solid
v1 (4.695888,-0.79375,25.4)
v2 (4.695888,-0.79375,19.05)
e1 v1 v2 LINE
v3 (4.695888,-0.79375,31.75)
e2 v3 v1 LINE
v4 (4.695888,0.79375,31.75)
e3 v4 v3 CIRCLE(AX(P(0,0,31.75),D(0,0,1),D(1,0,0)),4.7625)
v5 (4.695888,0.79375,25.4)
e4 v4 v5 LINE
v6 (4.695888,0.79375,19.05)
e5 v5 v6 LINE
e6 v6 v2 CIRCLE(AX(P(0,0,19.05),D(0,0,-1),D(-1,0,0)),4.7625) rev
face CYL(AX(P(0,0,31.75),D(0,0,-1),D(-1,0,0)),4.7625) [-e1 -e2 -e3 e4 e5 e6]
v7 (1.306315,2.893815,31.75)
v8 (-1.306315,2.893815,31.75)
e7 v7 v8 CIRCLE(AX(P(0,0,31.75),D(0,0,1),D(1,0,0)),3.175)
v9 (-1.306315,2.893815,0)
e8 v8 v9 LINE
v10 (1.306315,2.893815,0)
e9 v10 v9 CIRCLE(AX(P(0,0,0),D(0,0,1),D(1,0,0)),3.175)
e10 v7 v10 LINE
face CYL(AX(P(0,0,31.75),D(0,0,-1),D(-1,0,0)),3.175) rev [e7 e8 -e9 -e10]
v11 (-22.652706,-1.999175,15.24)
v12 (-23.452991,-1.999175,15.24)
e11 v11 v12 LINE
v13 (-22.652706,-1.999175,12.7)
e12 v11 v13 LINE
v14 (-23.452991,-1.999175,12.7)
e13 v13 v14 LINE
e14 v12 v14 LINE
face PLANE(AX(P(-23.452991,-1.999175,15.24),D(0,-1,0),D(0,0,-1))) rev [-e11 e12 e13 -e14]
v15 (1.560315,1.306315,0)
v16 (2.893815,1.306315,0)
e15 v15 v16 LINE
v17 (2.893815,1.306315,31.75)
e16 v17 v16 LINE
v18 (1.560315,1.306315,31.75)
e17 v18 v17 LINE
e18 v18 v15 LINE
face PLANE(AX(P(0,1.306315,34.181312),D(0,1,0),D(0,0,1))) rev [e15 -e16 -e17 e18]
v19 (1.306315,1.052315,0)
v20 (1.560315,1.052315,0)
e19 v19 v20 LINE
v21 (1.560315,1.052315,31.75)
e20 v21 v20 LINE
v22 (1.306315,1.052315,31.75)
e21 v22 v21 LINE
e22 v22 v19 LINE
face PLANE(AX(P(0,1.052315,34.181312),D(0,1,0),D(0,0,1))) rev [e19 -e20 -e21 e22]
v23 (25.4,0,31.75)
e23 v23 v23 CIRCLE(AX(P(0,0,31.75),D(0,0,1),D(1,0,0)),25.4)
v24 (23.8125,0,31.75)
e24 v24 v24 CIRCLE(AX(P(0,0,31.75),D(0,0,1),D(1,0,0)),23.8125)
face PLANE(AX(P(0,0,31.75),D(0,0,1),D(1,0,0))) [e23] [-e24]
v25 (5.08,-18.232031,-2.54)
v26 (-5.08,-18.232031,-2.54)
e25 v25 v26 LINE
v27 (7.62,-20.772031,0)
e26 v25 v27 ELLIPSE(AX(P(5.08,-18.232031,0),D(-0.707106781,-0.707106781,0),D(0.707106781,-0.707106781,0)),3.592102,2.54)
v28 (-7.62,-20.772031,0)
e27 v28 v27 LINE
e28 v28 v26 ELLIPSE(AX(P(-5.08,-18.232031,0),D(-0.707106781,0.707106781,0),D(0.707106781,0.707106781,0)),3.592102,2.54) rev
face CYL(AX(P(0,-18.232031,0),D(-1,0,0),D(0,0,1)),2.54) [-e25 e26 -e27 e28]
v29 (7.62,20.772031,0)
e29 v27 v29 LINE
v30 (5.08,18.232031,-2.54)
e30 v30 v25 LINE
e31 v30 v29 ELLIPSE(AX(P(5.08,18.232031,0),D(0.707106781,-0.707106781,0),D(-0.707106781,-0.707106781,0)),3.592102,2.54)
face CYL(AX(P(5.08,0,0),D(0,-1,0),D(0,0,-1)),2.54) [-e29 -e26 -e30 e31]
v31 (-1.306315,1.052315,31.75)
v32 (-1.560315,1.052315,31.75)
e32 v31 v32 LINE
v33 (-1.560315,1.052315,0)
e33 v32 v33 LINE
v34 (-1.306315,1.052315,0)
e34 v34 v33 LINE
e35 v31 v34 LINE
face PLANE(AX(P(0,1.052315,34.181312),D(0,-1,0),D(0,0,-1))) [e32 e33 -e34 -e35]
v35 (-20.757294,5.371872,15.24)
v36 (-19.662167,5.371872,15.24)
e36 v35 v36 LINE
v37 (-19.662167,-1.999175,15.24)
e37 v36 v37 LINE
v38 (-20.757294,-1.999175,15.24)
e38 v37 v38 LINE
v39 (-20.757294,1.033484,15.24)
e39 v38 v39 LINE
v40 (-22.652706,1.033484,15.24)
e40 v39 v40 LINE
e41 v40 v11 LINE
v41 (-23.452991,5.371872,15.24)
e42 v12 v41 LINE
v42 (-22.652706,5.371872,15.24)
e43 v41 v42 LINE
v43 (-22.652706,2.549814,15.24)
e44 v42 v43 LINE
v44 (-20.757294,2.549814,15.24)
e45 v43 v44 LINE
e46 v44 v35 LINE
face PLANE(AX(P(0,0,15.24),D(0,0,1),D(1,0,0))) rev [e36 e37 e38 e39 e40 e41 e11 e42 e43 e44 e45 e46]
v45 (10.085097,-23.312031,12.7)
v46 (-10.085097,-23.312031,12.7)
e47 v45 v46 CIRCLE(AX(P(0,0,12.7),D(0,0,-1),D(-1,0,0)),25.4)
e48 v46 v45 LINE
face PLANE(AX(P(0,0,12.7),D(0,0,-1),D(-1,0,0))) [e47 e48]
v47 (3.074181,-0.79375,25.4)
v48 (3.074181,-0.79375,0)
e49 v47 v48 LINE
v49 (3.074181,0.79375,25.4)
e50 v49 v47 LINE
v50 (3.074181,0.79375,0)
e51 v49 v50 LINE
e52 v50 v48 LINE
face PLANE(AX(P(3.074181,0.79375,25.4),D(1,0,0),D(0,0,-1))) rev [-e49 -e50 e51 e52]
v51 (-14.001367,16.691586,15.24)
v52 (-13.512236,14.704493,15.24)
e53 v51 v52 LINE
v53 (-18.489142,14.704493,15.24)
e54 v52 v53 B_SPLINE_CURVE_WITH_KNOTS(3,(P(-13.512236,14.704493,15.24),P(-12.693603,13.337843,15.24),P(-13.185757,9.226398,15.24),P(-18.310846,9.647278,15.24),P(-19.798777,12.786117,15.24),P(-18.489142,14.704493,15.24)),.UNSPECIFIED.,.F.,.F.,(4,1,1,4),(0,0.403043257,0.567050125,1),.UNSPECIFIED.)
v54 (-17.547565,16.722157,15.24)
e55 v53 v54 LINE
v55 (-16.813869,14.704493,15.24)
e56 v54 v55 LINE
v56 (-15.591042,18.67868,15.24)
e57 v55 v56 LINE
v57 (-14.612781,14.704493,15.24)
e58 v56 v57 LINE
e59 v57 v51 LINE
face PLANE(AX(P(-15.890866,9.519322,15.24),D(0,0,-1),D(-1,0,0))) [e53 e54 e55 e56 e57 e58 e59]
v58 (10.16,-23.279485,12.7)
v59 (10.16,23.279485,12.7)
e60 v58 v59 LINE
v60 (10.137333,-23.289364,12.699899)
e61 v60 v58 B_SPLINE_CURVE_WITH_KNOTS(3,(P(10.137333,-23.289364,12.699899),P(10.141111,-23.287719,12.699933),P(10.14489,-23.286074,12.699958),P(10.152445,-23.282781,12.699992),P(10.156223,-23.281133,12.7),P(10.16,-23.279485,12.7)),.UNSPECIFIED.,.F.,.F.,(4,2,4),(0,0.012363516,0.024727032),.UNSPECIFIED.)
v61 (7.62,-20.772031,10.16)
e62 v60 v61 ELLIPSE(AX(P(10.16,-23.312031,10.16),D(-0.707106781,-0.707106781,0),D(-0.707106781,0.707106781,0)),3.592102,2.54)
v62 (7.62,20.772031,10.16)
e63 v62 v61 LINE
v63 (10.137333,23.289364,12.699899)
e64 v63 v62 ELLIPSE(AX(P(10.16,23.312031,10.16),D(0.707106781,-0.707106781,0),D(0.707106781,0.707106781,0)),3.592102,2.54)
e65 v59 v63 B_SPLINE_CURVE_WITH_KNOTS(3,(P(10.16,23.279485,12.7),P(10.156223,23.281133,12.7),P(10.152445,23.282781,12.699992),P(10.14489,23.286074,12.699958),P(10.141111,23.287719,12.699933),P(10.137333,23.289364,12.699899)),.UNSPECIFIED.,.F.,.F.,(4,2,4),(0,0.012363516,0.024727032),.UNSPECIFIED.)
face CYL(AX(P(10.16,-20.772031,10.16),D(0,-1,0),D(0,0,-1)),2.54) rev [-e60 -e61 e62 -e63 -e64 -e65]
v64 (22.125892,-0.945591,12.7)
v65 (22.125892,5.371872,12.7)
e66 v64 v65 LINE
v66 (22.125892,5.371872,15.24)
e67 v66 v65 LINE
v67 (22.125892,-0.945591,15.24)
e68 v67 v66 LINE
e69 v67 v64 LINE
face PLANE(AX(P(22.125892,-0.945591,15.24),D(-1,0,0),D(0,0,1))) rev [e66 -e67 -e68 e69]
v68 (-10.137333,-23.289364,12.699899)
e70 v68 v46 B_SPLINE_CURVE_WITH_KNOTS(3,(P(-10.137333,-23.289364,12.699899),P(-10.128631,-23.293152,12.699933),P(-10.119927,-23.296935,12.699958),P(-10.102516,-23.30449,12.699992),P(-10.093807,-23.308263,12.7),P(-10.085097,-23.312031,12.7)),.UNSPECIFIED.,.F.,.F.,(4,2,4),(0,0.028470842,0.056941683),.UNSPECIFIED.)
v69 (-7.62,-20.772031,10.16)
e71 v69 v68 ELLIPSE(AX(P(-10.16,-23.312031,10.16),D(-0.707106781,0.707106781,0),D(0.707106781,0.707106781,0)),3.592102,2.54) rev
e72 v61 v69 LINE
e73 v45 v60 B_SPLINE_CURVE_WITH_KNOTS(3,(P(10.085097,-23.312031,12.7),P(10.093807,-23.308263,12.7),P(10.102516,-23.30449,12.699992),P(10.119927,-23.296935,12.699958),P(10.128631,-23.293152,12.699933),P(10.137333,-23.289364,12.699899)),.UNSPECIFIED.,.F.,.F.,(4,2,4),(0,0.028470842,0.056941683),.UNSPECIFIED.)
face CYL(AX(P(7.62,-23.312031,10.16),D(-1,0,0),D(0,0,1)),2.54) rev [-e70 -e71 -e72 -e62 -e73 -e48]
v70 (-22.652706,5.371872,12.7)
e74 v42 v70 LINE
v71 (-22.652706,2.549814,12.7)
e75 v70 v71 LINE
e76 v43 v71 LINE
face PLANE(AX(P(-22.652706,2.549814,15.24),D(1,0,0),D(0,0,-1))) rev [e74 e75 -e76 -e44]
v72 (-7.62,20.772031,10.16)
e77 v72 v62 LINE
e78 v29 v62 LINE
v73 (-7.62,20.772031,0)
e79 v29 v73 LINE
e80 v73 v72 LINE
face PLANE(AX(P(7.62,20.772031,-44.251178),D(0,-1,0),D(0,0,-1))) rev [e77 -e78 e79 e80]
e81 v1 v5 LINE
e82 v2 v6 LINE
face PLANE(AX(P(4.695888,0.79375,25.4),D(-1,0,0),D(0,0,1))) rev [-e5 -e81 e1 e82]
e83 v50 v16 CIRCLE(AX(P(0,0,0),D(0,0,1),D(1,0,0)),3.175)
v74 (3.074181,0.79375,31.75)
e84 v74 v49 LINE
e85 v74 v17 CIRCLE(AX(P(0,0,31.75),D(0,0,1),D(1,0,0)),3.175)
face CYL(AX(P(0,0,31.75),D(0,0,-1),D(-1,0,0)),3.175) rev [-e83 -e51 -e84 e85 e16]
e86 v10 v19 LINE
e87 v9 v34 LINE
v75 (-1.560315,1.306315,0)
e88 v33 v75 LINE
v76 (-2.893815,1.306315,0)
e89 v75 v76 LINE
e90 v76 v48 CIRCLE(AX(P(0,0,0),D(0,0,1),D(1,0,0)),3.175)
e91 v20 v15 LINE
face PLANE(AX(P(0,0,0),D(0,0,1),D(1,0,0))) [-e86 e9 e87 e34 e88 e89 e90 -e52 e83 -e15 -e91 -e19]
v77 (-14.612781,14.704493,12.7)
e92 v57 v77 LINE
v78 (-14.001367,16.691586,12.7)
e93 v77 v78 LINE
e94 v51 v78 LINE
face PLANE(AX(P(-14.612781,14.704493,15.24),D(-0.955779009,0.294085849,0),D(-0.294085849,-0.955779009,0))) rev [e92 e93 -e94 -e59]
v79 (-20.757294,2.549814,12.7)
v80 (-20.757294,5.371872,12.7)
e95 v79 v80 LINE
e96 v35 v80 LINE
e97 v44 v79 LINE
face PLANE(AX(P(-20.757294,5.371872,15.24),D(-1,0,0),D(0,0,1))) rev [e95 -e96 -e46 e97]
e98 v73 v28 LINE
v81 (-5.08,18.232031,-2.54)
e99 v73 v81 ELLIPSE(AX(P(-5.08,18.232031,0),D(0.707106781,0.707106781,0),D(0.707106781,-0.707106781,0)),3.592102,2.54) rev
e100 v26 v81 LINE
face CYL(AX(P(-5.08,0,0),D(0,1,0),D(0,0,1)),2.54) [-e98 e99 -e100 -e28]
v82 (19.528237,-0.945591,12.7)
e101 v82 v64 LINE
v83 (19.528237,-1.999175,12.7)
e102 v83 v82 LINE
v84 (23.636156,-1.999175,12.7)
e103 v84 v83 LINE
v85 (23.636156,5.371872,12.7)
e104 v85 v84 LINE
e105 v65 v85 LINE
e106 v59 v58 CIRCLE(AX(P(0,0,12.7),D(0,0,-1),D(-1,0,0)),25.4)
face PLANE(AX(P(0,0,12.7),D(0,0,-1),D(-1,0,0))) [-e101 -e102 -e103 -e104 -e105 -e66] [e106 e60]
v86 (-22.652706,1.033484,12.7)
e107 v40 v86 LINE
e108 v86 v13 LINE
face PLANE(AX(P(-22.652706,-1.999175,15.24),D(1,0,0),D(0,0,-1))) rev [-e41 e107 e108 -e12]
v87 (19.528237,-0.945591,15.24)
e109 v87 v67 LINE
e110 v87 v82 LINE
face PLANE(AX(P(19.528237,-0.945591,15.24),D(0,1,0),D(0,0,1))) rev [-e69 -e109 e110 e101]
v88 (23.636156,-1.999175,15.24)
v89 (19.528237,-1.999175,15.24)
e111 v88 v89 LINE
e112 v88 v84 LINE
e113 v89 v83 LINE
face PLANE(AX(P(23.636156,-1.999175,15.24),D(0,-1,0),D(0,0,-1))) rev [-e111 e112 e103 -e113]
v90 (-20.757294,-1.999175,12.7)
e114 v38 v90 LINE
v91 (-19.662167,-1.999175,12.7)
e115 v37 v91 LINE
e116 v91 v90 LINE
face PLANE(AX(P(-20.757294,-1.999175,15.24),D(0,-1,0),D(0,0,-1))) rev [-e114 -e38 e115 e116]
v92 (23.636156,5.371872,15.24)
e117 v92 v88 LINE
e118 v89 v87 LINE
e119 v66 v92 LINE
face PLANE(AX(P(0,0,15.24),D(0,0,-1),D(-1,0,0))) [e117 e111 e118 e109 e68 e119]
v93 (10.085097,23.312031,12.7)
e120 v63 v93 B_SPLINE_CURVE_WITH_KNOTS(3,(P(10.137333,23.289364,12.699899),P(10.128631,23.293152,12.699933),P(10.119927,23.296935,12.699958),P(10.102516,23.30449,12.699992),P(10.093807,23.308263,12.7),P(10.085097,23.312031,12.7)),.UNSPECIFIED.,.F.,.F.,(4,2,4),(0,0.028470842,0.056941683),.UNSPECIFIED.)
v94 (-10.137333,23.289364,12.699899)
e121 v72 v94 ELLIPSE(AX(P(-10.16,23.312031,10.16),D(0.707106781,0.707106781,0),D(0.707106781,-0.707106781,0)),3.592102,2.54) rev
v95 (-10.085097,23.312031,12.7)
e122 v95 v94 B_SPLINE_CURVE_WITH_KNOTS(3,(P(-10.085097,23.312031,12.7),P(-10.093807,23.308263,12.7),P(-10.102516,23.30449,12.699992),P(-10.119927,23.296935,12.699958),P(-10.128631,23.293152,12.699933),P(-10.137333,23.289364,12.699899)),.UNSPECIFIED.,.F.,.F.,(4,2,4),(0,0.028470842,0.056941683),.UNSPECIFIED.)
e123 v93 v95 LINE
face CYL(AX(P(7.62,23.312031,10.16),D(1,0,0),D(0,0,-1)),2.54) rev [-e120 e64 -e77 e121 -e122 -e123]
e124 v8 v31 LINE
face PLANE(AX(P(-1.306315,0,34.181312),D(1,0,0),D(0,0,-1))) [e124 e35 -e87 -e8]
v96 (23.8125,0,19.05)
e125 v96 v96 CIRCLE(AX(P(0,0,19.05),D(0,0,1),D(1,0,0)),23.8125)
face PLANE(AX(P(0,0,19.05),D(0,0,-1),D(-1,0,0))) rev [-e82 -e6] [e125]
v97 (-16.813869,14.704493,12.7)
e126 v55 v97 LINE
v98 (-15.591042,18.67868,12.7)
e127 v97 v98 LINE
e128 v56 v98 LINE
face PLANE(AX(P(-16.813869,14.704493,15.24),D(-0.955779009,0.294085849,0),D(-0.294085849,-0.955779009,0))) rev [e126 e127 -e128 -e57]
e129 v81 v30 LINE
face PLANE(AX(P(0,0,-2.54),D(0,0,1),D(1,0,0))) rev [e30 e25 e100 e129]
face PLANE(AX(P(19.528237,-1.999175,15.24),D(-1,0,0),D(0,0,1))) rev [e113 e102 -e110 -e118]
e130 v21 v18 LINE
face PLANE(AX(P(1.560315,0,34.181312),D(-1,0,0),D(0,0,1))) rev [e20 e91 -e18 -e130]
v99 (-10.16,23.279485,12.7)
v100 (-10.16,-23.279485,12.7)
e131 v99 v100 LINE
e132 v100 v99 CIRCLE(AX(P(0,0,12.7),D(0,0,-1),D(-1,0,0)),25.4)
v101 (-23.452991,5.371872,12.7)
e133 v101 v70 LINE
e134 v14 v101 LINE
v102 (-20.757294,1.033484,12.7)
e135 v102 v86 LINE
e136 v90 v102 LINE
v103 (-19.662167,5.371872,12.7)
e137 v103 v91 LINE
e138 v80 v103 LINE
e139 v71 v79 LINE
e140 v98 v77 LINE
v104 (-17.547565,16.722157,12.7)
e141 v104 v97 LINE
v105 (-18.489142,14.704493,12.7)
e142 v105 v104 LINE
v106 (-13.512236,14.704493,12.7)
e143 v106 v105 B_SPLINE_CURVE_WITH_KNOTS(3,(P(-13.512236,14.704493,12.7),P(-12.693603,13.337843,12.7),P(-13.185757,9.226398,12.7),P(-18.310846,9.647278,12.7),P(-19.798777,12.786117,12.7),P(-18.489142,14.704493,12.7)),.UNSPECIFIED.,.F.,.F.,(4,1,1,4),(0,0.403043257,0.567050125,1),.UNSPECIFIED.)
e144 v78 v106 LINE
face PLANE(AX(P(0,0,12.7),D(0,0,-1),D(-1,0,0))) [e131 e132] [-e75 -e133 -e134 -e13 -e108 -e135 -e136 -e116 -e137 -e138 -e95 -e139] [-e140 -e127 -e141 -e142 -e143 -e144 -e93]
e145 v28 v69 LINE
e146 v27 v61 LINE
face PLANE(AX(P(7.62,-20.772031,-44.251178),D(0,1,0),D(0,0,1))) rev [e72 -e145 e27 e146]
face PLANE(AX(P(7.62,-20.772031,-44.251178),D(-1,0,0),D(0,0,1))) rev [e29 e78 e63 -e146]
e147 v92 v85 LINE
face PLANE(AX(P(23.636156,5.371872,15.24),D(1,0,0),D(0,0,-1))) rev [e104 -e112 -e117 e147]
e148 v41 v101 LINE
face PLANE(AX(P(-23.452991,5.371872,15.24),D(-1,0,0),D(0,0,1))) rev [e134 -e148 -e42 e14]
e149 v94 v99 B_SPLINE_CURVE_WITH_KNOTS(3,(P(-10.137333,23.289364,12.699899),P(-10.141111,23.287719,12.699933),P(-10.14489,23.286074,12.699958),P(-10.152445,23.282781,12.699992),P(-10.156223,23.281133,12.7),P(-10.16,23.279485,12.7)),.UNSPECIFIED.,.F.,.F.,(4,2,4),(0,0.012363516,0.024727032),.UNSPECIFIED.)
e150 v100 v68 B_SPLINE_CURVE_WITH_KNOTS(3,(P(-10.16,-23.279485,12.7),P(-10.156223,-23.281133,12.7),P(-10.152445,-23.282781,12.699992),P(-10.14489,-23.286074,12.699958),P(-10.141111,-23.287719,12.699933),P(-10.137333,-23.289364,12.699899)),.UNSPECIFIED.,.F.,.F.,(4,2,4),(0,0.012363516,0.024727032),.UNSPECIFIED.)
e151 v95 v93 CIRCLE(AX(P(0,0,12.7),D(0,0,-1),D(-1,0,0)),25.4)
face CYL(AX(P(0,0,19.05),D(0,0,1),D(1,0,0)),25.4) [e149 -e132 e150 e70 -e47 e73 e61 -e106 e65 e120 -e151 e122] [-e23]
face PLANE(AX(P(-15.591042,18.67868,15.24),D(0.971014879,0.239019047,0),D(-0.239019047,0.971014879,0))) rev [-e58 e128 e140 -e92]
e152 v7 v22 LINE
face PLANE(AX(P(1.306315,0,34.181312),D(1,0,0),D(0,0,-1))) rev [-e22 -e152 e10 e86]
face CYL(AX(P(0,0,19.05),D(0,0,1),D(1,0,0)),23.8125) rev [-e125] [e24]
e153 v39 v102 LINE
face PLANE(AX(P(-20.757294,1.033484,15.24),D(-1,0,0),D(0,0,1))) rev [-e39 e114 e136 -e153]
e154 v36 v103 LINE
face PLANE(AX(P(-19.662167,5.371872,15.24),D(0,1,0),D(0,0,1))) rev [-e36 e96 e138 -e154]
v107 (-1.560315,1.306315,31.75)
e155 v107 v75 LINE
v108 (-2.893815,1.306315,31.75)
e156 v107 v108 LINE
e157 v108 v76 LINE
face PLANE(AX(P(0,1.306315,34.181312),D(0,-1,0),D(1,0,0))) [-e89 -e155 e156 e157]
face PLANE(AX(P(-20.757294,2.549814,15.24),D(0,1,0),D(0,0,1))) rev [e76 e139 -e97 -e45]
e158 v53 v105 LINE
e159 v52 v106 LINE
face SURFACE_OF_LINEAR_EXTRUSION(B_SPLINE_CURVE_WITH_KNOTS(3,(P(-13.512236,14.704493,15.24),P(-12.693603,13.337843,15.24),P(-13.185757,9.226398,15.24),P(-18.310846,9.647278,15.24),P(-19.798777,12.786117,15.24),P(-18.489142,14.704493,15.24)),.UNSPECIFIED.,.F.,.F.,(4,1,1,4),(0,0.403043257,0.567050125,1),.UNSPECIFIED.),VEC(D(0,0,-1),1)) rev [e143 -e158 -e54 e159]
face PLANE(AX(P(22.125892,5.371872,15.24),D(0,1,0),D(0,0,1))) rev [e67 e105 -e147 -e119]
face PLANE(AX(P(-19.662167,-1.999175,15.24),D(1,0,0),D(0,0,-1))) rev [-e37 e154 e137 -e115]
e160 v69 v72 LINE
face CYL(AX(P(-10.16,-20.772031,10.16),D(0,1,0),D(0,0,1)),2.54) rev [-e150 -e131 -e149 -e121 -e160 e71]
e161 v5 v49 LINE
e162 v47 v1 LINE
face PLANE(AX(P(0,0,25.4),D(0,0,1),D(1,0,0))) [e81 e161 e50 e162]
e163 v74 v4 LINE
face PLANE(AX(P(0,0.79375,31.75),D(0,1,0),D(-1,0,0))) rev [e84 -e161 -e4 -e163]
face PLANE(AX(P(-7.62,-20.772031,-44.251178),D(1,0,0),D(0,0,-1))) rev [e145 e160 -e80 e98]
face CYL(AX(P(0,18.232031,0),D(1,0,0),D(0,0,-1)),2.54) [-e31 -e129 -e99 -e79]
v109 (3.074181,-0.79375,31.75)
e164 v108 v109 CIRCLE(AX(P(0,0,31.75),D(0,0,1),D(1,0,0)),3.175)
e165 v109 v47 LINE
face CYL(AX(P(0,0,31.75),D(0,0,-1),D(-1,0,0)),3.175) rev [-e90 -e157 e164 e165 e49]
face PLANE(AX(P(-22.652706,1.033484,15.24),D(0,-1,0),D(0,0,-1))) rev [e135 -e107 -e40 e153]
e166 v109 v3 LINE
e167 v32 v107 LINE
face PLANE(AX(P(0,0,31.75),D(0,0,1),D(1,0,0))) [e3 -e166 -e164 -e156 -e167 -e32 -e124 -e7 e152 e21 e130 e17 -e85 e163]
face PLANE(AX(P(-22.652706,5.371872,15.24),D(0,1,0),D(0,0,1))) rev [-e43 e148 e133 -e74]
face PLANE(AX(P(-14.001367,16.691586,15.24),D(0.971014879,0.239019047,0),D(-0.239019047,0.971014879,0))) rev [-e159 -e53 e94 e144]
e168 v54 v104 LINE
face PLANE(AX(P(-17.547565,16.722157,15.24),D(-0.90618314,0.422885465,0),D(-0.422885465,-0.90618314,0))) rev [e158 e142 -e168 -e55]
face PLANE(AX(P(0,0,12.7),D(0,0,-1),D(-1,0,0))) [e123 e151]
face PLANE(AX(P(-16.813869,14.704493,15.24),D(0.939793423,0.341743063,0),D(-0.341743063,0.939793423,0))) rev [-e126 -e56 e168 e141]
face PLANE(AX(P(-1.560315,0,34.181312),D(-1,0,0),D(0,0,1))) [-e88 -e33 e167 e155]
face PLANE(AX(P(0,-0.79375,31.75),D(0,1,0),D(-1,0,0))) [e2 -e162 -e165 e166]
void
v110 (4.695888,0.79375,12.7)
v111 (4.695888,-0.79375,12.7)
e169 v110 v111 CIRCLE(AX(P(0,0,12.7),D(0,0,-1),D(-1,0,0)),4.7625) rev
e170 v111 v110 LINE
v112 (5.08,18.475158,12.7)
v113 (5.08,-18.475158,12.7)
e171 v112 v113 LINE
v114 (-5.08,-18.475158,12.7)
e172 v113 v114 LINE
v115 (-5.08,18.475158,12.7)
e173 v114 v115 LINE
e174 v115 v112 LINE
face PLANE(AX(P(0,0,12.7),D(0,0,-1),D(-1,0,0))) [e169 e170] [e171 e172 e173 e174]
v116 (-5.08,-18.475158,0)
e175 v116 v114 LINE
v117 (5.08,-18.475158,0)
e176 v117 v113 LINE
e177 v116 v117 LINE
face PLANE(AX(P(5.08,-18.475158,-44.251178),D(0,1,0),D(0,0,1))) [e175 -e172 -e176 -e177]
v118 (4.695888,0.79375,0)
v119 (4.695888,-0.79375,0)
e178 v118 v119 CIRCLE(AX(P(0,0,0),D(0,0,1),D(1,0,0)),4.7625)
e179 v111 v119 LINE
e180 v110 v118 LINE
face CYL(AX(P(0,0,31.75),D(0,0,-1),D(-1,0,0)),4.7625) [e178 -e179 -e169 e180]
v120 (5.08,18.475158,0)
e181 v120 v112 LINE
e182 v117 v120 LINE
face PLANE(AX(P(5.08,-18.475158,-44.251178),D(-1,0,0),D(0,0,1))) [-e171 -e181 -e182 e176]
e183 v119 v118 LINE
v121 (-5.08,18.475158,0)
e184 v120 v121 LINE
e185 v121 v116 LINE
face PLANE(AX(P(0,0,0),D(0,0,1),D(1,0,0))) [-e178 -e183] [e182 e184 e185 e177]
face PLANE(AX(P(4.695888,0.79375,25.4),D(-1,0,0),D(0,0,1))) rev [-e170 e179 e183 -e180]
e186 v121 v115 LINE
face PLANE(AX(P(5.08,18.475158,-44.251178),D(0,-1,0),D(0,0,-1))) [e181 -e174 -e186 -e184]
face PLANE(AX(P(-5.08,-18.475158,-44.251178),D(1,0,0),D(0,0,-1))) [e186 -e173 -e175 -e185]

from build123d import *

# Parameters (mm, degrees)
BOSS_EXTRUDE1_DEPTH = 31.75
SKETCH4_R           = 25.4
SKETCH4_R_2         = 23.8125
BOSS_EXTRUDE3_DEPTH = 12.7
SKETCH5_W           = 1.621707797
SKETCH5_H           = 1.5875
BOSS_EXTRUDE4_DEPTH = 25.4
SKETCH6_W           = 0.254
SKETCH6_H           = 0.254
BOSS_EXTRUDE5_DEPTH = 31.75
SKETCH9_R           = 25.4
SKETCH9_R_2         = 4.593847271
BOSS_EXTRUDE6_DEPTH = 6.35
SKETCH10_W          = 15.24
SKETCH10_H          = 41.544062962
SKETCH10_W_2        = 10.16
SKETCH10_H_2        = 36.95031579
BOSS_EXTRUDE7_DEPTH = 12.7
SKETCH11_W          = 15.24
SKETCH11_H          = 41.544062962
BOSS_EXTRUDE8_DEPTH = 2.54
FILLET1_R           = 2.54
FILLET2_R           = 2.54
CUT_EXTRUDE1_DEPTH  = 2.54


with BuildPart() as part:
    # Sketch2 → Boss-Extrude1 (new body)
    with BuildSketch(Plane.XY):
        with BuildLine():
            ThreePointArc((3.074180531, 0.79375), (-3.175, 0), (3.074180531, -0.79375))
            Line((3.074180531, -0.79375), (4.695888328, -0.79375))
            ThreePointArc((4.695888328, -0.79375), (-4.7625, 0), (4.695888328, 0.79375))
            Line((4.695888328, 0.79375), (3.074180531, 0.79375))
        make_face()
    extrude(amount=BOSS_EXTRUDE1_DEPTH)

    # Sketch5 → Boss-Extrude4 (add)
    with BuildSketch(Plane.XY):
        with Locations((3.88503443, 0)):
            Rectangle(SKETCH5_W, SKETCH5_H)
    extrude(amount=BOSS_EXTRUDE4_DEPTH)

    # Sketch6 → Boss-Extrude5 (add)
    with BuildSketch(Plane.XY):
        with BuildLine():
            Line((-1.306315103, 2.893815103), (-1.306315103, 1.306315103))
            Line((-1.306315103, 1.306315103), (-1.306315103, 1.052315103))
            Line((-1.306315103, 1.052315103), (-1.560315103, 1.052315103))
            Line((-1.560315103, 1.052315103), (-1.560315103, 1.306315103))
            Line((-1.560315103, 1.306315103), (-2.893815103, 1.306315103))
            ThreePointArc((-2.893815103, 1.306315103), (-2.428847118, 2.428847118), (-1.306315103, 2.893815103))
        make_face()
        with BuildLine():
            Line((1.306315103, 1.306315103), (2.893815103, 1.306315103))
            ThreePointArc((2.893815103, 1.306315103), (2.428847118, 2.428847118), (1.306315103, 2.893815103))
            Line((1.306315103, 2.893815103), (1.306315103, 1.306315103))
        make_face()
        with Locations((1.433315103, 1.179315103)):
            Rectangle(SKETCH6_W, SKETCH6_H)
    extrude(amount=BOSS_EXTRUDE5_DEPTH)



with BuildPart() as body_2:
    # Sketch4 → Boss-Extrude3 (new body)
    with BuildSketch(Plane.XY.offset(31.75)):
        Circle(SKETCH4_R)
        Circle(SKETCH4_R_2, mode=Mode.SUBTRACT)
    extrude(amount=-BOSS_EXTRUDE3_DEPTH)


with BuildPart() as part_1:
    add(part.part)

    add(body_2.part)  # Boss-Extrude6 merges body 2
    # Sketch9 → Boss-Extrude6 (add)
    with BuildSketch(Plane(origin=(0, 0, 19.05), x_dir=(-1, 0, 0), z_dir=(0, 0, -1))):
        with Locations(Location((0, 0, 0), (0, 0, 180))):
            Circle(SKETCH9_R)
        Circle(SKETCH9_R_2, mode=Mode.SUBTRACT)
    extrude(amount=BOSS_EXTRUDE6_DEPTH)

    # Sketch10 → Boss-Extrude7 (add)
    with BuildSketch(Plane(origin=(0, 0, 12.7), x_dir=(-1, 0, 0), z_dir=(0, 0, -1))):
        Rectangle(SKETCH10_W, SKETCH10_H)
        Rectangle(SKETCH10_W_2, SKETCH10_H_2, mode=Mode.SUBTRACT)
    extrude(amount=BOSS_EXTRUDE7_DEPTH)

    # Sketch11 → Boss-Extrude8 (add)
    with BuildSketch(Plane(origin=(0, 0, 0), x_dir=(-1, 0, 0), z_dir=(0, 0, -1))):
        Rectangle(SKETCH11_W, SKETCH11_H)
    extrude(amount=BOSS_EXTRUDE8_DEPTH)

    # Fillet1
    # the kernel refuses this fillet: 2.54 mm, written as the material it adds along each edge
    with BuildSketch(Plane(origin=(-7.62, -20.772031481, 12.7), x_dir=(-1, 0, 0), z_dir=(0, 1, 0)), Plane(origin=(7.62, 20.772031481, 12.7), x_dir=(1, 0, 0), z_dir=(0, -1, 0))) as fillet1_piece_1:
        with BuildLine():
            CenterArc((FILLET1_R, -FILLET1_R), FILLET1_R, 90, 90)
            Line((0, -FILLET1_R), (0, 0))
            Line((0, 0), (FILLET1_R, 0))
        make_face()
    extrude(amount=41.544062961)
    with BuildSketch(Plane(origin=(-7.62, 20.772031481, 12.7), x_dir=(0, 1, 0), z_dir=(1, 0, 0)), Plane(origin=(7.62, -20.772031481, 12.7), x_dir=(0, -1, 0), z_dir=(-1, 0, 0))) as fillet1_piece_2:
        with BuildLine():
            CenterArc((FILLET1_R, -FILLET1_R), FILLET1_R, 90, 90)
            Line((0, -FILLET1_R), (0, 0))
            Line((0, 0), (FILLET1_R, 0))
        make_face()
    extrude(amount=15.24)
    with BuildSketch(Plane(origin=(7.62, -20.772031481, 12.7), x_dir=(0, -1, 0), z_dir=(-1, 0, 0))) as fillet1_piece_3a_section:
        with BuildLine():
            CenterArc((FILLET1_R, -FILLET1_R), FILLET1_R, 90, 90)
            Line((0, -FILLET1_R), (0, 0))
            Line((0, 0), (FILLET1_R, 0))
        make_face()
    fillet1_piece_3a = extrude(amount=21.59, mode=Mode.PRIVATE)
    fillet1_piece_3a = fillet1_piece_3a & Plane(origin=(0, 0, 12.091015905), x_dir=(1, 0, 0), z_dir=(0, 0, 1)) * Cylinder(25.4, 54, mode=Mode.PRIVATE)
    fillet1_piece_3a = split(fillet1_piece_3a, bisect_by=Plane(origin=(-7.62, -21.280779279, 12.091015905), z_dir=(-1, 0, 0)), keep=Keep.TOP, mode=Mode.PRIVATE)
    with BuildSketch(Plane(origin=(-7.62, -27.122031481, 12.7), x_dir=(-1, 0, 0), z_dir=(0, 1, 0))) as fillet1_piece_3b_section:
        with BuildLine():
            CenterArc((FILLET1_R, -FILLET1_R), FILLET1_R, 90, 90)
            Line((0, -FILLET1_R), (0, 0))
            Line((0, 0), (FILLET1_R, 0))
        make_face()
    fillet1_piece_3b = extrude(amount=47.894062961, mode=Mode.PRIVATE)
    fillet1_piece_3b = fillet1_piece_3b & Plane(origin=(0, 0, 12.105999198), x_dir=(1, 0, 0), z_dir=(0, 0, 1)) * Cylinder(25.4, 106, mode=Mode.PRIVATE)
    fillet1_piece_3b = split(fillet1_piece_3b, bisect_by=Plane(origin=(-8.162359675, -20.772031481, 12.105999198), z_dir=(0, -1, 0)), keep=Keep.TOP, mode=Mode.PRIVATE)
    fillet1_piece_3 = fillet1_piece_3a & fillet1_piece_3b
    add(fillet1_piece_3)
    with BuildSketch(Plane(origin=(-7.62, -20.772031481, 12.7), x_dir=(-1, 0, 0), z_dir=(0, 1, 0))) as fillet1_piece_4a_section:
        with BuildLine():
            CenterArc((FILLET1_R, -FILLET1_R), FILLET1_R, 90, 90)
            Line((0, -FILLET1_R), (0, 0))
            Line((0, 0), (FILLET1_R, 0))
        make_face()
    fillet1_piece_4a = extrude(amount=47.894062961, mode=Mode.PRIVATE)
    fillet1_piece_4a = fillet1_piece_4a & Plane(origin=(0, 0, 12.105997934), x_dir=(1, 0, 0), z_dir=(0, 0, 1)) * Cylinder(25.4, 106, mode=Mode.PRIVATE)
    fillet1_piece_4a = split(fillet1_piece_4a, bisect_by=Plane(origin=(-8.162364443, 20.772031481, 12.105997934), z_dir=(0, 1, 0)), keep=Keep.TOP, mode=Mode.PRIVATE)
    with BuildSketch(Plane(origin=(-13.97, 20.772031481, 12.7), x_dir=(0, 1, 0), z_dir=(1, 0, 0))) as fillet1_piece_4b_section:
        with BuildLine():
            CenterArc((FILLET1_R, -FILLET1_R), FILLET1_R, 90, 90)
            Line((0, -FILLET1_R), (0, 0))
            Line((0, 0), (FILLET1_R, 0))
        make_face()
    fillet1_piece_4b = extrude(amount=21.59, mode=Mode.PRIVATE)
    fillet1_piece_4b = fillet1_piece_4b & Plane(origin=(0, 0, 12.0910159), x_dir=(1, 0, 0), z_dir=(0, 0, 1)) * Cylinder(25.4, 54, mode=Mode.PRIVATE)
    fillet1_piece_4b = split(fillet1_piece_4b, bisect_by=Plane(origin=(-7.62, 21.28077831, 12.0910159), z_dir=(-1, 0, 0)), keep=Keep.TOP, mode=Mode.PRIVATE)
    fillet1_piece_4 = fillet1_piece_4a & fillet1_piece_4b
    add(fillet1_piece_4)
    with BuildSketch(Plane(origin=(-7.62, 20.772031481, 12.7), x_dir=(0, 1, 0), z_dir=(1, 0, 0))) as fillet1_piece_5a_section:
        with BuildLine():
            CenterArc((FILLET1_R, -FILLET1_R), FILLET1_R, 90, 90)
            Line((0, -FILLET1_R), (0, 0))
            Line((0, 0), (FILLET1_R, 0))
        make_face()
    fillet1_piece_5a = extrude(amount=21.59, mode=Mode.PRIVATE)
    fillet1_piece_5a = fillet1_piece_5a & Plane(origin=(0, 0, 12.091015905), x_dir=(1, 0, 0), z_dir=(0, 0, 1)) * Cylinder(25.4, 54, mode=Mode.PRIVATE)
    fillet1_piece_5a = split(fillet1_piece_5a, bisect_by=Plane(origin=(7.62, 21.280779279, 12.091015905), z_dir=(1, 0, 0)), keep=Keep.TOP, mode=Mode.PRIVATE)
    with BuildSketch(Plane(origin=(7.62, 27.122031481, 12.7), x_dir=(1, 0, 0), z_dir=(0, -1, 0))) as fillet1_piece_5b_section:
        with BuildLine():
            CenterArc((FILLET1_R, -FILLET1_R), FILLET1_R, 90, 90)
            Line((0, -FILLET1_R), (0, 0))
            Line((0, 0), (FILLET1_R, 0))
        make_face()
    fillet1_piece_5b = extrude(amount=47.894062961, mode=Mode.PRIVATE)
    fillet1_piece_5b = fillet1_piece_5b & Plane(origin=(0, 0, 12.105999198), x_dir=(1, 0, 0), z_dir=(0, 0, 1)) * Cylinder(25.4, 106, mode=Mode.PRIVATE)
    fillet1_piece_5b = split(fillet1_piece_5b, bisect_by=Plane(origin=(8.162359675, 20.772031481, 12.105999198), z_dir=(0, 1, 0)), keep=Keep.TOP, mode=Mode.PRIVATE)
    fillet1_piece_5 = fillet1_piece_5a & fillet1_piece_5b
    add(fillet1_piece_5)
    with BuildSketch(Plane(origin=(13.97, -20.772031481, 12.7), x_dir=(0, -1, 0), z_dir=(-1, 0, 0))) as fillet1_piece_6a_section:
        with BuildLine():
            CenterArc((FILLET1_R, -FILLET1_R), FILLET1_R, 90, 90)
            Line((0, -FILLET1_R), (0, 0))
            Line((0, 0), (FILLET1_R, 0))
        make_face()
    fillet1_piece_6a = extrude(amount=21.59, mode=Mode.PRIVATE)
    fillet1_piece_6a = fillet1_piece_6a & Plane(origin=(0, 0, 12.0910159), x_dir=(1, 0, 0), z_dir=(0, 0, 1)) * Cylinder(25.4, 54, mode=Mode.PRIVATE)
    fillet1_piece_6a = split(fillet1_piece_6a, bisect_by=Plane(origin=(7.62, -21.28077831, 12.0910159), z_dir=(1, 0, 0)), keep=Keep.TOP, mode=Mode.PRIVATE)
    with BuildSketch(Plane(origin=(7.62, 20.772031481, 12.7), x_dir=(1, 0, 0), z_dir=(0, -1, 0))) as fillet1_piece_6b_section:
        with BuildLine():
            CenterArc((FILLET1_R, -FILLET1_R), FILLET1_R, 90, 90)
            Line((0, -FILLET1_R), (0, 0))
            Line((0, 0), (FILLET1_R, 0))
        make_face()
    fillet1_piece_6b = extrude(amount=47.894062961, mode=Mode.PRIVATE)
    fillet1_piece_6b = fillet1_piece_6b & Plane(origin=(0, 0, 12.105997934), x_dir=(1, 0, 0), z_dir=(0, 0, 1)) * Cylinder(25.4, 106, mode=Mode.PRIVATE)
    fillet1_piece_6b = split(fillet1_piece_6b, bisect_by=Plane(origin=(8.162364443, -20.772031481, 12.105997934), z_dir=(0, -1, 0)), keep=Keep.TOP, mode=Mode.PRIVATE)
    fillet1_piece_6 = fillet1_piece_6a & fillet1_piece_6b
    add(fillet1_piece_6)

    # Fillet2
    fillet2_edges = [part_1.edges().sort_by_distance(p)[0] for p in [
        (-7.62, 0, -2.54),
        (0, 20.772031481, -2.54),
        (7.62, 0, -2.54),
        (0, -20.772031481, -2.54),
    ]]
    fillet(fillet2_edges, radius=FILLET2_R)

    # Sketch12 → Cut-Extrude1 (cut)
    with BuildSketch(Plane(origin=(0, 0, 12.7), x_dir=(-1, 0, 0), z_dir=(0, 0, -1))):
        with BuildLine():
            Line((16.813868884, 14.704492606), (17.547564981, 16.722156872))
            Line((17.547564981, 16.722156872), (18.489141639, 14.704492606))
            add(Edge.make_bspline(
                [(18.489141639, 14.704492606), (19.798776644, 12.786117496), (18.310846307, 9.647278033), (13.185757244, 9.226397866), (12.693603367, 13.337843102), (13.512236449, 14.704492606)],
                knots=[0, 0, 0, 0, 0.432949875, 0.596956743, 1, 1, 1, 1], degree=3))
            Line((13.512236449, 14.704492606), (14.00136718, 16.691586201))
            Line((14.00136718, 16.691586201), (14.612780594, 14.704492606))
            Line((14.612780594, 14.704492606), (15.591042056, 18.678679797))
            Line((15.591042056, 18.678679797), (16.813868884, 14.704492606))
        make_face()
        Polygon((22.65270588, 5.371871988), (23.452991012, 5.371871988), (23.452991012, -1.999175277), (22.65270588, -1.999175277), (22.65270588, 1.033484169), (20.757293726, 1.033484169), (20.757293726, -1.999175277), (19.662166704, -1.999175277), (19.662166704, 5.371871988), (20.757293726, 5.371871988), (20.757293726, 2.549813892), (22.65270588, 2.549813892), align=None)
        Polygon((-23.636155952, 5.371871988), (-23.636155952, -1.999175277), (-19.528236773, -1.999175277), (-19.528236773, -0.945591056), (-22.125891548, -0.945591056), (-22.125891548, 5.371871988), align=None)
    extrude(amount=-CUT_EXTRUDE1_DEPTH, mode=Mode.SUBTRACT)


solid = part_1.part
